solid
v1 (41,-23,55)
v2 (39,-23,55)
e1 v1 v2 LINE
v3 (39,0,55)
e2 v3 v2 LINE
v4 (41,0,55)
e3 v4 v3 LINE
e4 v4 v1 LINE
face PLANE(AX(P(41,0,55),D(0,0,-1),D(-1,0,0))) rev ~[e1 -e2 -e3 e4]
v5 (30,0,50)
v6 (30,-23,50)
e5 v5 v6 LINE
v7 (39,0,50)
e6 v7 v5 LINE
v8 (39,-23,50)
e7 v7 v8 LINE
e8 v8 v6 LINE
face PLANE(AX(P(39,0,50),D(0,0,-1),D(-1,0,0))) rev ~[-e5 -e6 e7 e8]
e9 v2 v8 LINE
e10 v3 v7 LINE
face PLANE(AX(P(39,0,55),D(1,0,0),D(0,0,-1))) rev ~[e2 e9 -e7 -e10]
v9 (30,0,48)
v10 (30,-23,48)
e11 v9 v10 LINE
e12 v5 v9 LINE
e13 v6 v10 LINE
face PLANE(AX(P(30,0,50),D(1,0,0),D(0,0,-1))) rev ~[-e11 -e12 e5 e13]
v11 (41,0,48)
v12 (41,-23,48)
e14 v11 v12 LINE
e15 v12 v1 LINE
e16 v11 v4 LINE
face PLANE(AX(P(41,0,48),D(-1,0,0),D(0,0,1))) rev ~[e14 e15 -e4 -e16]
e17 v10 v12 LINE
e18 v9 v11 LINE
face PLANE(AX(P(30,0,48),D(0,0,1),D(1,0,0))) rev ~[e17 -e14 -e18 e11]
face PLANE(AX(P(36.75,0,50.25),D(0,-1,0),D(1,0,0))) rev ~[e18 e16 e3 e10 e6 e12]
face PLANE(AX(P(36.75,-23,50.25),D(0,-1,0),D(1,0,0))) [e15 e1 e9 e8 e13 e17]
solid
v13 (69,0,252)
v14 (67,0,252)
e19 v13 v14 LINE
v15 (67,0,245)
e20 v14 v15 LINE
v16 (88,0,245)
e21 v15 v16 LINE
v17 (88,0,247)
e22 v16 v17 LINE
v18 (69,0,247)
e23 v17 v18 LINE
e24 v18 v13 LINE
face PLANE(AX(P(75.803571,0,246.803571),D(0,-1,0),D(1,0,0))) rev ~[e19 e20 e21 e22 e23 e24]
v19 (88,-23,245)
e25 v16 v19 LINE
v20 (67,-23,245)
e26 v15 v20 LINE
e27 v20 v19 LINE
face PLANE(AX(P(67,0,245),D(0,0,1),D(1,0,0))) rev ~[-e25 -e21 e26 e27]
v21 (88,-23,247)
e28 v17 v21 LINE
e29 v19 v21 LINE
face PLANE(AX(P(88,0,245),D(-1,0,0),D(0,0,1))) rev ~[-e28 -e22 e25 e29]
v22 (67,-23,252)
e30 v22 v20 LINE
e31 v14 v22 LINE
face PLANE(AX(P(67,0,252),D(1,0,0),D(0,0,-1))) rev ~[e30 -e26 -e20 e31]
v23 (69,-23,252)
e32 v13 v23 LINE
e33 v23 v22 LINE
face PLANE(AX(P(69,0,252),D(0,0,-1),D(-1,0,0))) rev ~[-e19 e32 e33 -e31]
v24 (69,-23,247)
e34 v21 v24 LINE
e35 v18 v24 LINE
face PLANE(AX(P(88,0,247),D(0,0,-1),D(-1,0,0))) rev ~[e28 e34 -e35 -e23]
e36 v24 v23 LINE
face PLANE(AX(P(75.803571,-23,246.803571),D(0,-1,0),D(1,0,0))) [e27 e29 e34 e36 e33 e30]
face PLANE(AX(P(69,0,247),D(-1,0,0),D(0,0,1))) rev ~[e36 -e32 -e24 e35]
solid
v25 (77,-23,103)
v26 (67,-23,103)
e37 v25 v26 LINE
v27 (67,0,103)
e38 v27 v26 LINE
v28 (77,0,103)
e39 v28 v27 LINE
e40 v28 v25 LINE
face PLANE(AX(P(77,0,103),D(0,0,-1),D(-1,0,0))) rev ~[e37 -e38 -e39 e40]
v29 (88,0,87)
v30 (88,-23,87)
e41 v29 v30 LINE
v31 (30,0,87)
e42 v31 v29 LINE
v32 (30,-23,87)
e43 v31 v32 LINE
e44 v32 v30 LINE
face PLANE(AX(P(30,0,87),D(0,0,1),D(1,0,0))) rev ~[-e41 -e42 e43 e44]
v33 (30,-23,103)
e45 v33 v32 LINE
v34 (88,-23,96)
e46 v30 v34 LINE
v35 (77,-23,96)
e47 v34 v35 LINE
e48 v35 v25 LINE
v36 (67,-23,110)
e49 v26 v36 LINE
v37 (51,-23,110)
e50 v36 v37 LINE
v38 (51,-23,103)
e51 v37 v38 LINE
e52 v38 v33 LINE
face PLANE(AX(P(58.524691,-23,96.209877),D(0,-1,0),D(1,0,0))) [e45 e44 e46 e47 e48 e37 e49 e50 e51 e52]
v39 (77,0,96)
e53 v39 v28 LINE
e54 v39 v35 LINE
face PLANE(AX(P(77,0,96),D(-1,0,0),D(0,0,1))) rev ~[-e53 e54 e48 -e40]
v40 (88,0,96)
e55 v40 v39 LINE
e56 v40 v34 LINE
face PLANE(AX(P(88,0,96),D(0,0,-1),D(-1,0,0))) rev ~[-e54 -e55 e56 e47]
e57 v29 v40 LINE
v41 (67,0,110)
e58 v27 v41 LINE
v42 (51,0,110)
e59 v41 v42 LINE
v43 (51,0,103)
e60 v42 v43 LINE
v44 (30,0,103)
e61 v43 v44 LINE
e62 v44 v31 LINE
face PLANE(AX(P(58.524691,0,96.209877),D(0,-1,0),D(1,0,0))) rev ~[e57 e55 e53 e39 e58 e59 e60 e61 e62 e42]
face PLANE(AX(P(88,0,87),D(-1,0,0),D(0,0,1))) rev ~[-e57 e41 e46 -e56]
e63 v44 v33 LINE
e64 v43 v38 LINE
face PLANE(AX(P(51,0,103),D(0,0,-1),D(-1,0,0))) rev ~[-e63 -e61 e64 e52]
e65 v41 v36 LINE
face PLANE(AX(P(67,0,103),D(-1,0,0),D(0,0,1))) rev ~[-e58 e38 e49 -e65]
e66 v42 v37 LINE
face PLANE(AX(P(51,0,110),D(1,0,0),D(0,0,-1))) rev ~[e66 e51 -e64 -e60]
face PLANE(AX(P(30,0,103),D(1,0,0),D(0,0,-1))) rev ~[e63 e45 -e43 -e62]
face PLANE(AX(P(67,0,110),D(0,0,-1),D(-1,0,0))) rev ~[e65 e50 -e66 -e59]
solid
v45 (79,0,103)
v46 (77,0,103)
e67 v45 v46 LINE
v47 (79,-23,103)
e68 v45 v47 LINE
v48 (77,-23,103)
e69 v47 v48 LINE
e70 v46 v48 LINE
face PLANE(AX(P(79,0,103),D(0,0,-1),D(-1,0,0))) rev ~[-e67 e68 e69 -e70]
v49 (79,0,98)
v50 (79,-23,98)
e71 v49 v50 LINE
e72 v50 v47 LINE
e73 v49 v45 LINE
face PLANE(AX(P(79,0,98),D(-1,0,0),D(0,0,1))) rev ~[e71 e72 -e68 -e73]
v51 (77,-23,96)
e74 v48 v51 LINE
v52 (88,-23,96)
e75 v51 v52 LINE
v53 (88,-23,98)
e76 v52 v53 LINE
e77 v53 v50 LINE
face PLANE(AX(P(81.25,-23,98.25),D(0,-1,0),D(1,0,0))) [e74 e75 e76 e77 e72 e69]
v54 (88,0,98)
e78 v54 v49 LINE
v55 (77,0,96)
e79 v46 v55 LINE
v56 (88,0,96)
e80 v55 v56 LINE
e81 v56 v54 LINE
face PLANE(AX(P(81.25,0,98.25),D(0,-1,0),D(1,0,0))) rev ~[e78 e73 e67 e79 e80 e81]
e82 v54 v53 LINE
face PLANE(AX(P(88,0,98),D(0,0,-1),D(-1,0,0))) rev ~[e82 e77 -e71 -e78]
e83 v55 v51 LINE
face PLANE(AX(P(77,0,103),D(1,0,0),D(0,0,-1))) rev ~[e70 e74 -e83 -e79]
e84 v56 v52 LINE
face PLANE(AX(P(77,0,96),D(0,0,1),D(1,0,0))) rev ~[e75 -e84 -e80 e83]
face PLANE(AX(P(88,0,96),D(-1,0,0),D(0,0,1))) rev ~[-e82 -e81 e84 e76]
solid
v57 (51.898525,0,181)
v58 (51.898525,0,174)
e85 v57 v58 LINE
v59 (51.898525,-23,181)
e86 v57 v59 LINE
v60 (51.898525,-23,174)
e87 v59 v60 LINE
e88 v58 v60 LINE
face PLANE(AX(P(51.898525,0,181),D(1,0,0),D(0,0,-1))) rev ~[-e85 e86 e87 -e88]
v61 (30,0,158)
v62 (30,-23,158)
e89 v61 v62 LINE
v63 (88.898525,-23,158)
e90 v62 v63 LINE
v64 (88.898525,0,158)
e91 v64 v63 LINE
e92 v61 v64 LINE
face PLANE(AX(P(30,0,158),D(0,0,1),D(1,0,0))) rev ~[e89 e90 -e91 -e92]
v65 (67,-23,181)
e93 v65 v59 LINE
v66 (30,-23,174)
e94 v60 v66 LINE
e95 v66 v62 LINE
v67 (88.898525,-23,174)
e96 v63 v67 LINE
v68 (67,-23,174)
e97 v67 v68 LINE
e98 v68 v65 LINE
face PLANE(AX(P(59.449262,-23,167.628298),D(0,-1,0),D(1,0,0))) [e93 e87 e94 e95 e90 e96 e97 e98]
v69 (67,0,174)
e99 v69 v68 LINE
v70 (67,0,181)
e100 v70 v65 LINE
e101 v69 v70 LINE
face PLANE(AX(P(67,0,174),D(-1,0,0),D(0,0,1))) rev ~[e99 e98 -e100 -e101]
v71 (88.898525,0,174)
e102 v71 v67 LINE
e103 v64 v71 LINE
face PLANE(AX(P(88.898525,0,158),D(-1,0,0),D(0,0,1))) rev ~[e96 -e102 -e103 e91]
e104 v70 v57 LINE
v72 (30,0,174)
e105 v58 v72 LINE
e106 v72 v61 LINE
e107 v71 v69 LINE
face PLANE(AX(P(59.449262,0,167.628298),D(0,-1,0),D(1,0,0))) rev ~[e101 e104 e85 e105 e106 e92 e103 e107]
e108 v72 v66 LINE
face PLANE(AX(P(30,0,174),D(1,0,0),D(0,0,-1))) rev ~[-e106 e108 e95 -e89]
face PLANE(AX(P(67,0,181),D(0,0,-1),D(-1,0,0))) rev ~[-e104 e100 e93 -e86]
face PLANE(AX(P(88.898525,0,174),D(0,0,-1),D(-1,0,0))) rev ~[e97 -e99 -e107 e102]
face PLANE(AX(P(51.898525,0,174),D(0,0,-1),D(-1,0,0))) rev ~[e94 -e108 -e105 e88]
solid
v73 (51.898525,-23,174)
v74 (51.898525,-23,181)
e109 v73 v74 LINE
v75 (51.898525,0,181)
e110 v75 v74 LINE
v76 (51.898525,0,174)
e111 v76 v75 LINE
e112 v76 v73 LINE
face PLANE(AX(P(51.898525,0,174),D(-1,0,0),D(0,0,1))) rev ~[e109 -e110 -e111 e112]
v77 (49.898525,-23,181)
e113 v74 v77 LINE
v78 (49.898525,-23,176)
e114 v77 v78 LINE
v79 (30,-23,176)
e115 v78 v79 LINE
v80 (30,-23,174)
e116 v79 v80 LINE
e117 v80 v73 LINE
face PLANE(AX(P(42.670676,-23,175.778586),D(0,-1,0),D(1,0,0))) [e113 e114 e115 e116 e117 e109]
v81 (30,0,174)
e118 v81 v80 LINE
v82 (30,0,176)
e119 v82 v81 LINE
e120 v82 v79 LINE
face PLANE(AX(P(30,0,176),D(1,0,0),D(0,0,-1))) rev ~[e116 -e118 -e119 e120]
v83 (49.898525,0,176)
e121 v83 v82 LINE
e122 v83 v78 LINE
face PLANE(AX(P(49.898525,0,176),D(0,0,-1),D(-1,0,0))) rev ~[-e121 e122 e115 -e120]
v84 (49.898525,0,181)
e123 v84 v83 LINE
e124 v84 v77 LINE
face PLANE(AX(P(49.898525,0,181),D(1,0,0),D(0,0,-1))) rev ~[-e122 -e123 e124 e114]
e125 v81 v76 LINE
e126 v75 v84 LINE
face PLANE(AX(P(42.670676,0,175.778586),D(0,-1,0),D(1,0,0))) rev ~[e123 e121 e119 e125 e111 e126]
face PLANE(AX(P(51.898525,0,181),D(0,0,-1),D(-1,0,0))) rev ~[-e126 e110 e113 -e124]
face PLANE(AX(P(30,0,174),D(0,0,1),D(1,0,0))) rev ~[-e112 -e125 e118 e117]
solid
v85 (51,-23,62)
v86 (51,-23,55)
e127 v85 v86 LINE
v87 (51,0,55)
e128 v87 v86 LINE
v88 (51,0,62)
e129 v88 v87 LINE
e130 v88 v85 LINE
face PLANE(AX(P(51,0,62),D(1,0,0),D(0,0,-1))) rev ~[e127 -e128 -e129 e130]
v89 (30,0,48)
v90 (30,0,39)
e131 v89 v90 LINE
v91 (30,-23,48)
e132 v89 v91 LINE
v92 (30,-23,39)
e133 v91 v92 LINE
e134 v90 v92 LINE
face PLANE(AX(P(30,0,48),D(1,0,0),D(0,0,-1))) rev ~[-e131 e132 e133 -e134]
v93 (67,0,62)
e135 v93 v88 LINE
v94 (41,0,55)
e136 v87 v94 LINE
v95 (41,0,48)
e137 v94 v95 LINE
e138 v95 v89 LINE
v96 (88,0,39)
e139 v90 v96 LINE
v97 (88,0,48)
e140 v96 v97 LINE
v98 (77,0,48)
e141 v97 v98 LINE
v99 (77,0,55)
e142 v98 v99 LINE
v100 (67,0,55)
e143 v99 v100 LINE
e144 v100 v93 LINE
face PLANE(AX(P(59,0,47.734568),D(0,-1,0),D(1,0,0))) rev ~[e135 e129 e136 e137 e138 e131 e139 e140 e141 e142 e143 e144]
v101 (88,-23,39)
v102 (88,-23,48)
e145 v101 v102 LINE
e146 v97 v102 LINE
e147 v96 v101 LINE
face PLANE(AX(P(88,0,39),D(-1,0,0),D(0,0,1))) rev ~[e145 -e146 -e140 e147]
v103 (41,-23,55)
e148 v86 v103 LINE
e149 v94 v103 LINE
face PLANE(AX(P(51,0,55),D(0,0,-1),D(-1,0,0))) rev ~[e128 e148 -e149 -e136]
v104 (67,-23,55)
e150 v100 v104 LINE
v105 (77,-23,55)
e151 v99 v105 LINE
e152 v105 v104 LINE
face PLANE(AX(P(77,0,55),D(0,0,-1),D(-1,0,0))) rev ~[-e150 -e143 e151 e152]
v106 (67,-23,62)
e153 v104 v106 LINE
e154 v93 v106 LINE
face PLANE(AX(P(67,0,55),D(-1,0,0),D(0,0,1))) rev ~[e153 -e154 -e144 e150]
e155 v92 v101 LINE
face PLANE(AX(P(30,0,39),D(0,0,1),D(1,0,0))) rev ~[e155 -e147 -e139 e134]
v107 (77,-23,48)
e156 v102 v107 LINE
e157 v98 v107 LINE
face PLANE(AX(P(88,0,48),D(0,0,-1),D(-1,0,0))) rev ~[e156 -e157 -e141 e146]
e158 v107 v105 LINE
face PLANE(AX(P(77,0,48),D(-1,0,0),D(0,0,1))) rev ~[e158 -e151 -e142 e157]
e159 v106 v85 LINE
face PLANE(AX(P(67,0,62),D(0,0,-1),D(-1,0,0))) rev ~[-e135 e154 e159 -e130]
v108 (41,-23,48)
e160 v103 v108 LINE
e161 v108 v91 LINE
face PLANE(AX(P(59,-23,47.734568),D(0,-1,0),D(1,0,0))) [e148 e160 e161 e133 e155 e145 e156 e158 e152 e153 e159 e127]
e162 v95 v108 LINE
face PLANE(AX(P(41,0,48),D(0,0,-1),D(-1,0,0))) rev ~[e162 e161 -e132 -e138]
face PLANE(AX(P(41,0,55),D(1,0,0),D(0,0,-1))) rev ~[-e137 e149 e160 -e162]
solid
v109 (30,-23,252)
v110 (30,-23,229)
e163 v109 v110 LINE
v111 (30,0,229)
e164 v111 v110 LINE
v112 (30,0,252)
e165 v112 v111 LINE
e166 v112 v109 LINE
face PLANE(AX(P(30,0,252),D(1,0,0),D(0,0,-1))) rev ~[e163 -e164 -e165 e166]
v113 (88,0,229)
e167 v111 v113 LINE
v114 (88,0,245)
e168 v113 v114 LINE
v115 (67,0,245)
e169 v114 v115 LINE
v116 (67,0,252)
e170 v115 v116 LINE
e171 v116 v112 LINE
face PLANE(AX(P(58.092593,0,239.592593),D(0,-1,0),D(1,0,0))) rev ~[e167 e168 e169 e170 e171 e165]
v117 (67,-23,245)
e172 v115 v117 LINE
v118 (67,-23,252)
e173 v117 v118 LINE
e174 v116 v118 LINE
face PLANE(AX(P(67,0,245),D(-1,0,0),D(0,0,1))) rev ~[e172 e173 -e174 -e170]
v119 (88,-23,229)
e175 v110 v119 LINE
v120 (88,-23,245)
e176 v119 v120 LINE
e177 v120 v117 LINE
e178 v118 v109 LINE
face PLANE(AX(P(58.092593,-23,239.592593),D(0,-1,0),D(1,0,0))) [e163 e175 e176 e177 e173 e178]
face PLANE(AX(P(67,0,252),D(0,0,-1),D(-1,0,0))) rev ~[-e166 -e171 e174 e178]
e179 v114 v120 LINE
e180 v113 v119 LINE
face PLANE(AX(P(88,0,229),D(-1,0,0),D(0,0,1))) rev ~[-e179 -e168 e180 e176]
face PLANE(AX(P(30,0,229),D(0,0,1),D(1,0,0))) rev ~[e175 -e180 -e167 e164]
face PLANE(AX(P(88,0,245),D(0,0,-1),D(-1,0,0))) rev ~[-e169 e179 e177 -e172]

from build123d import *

# Parameters (mm, degrees)
F4_DEPTH = 23
F5_DEPTH = 23


# Not quite as in the source:
# - a feature names something its author has since deleted; it is built from what else it names


with BuildPart() as f4:
    # F2 (on Front) → F4 (new body)
    with BuildSketch(Plane.XZ):
        Polygon((67, 181), (51.8985245079, 181), (51.8985245079, 174), (30, 174), (30, 158), (88.8985245079, 158), (88.8985245079, 174), (67, 174), align=None)
    extrude(amount=F4_DEPTH)


with BuildPart() as f4b:
    # F1 (on Front) → F4, piece 2 (new body)
    with BuildSketch(Plane.XZ):
        Polygon((67, 252), (30, 252), (30, 229), (88, 229), (88, 245), (67, 245), align=None)
    extrude(amount=F4_DEPTH)


with BuildPart() as f4c:
    # F3 (on Front) → F4, piece 3 (new body)
    with BuildSketch(Plane.XZ):
        Polygon((67, 110), (51, 110), (51, 103), (41, 103), (30, 103), (30, 96), (30, 87), (88, 87), (88, 96), (77, 96), (77, 103), (67, 103), align=None)
    extrude(amount=F4_DEPTH)


with BuildPart() as f4d:
    # F3 (on Front) → F4, piece 4 (new body)
    with BuildSketch(Plane.XZ):
        Polygon((51, 55), (41, 55), (41, 48), (30, 48), (30, 39), (88, 39), (88, 48), (77, 48), (77, 55), (67, 55), (67, 62), (51, 62), align=None)
    extrude(amount=F4_DEPTH)


with BuildPart() as f5:
    # F2 (on Front) → F5 (new body)
    with BuildSketch(Plane.XZ):
        Polygon((51.8985245079, 181), (49.8985245079, 181), (49.8985245079, 176), (30, 176), (30, 174), (51.8985245079, 174), align=None)
    extrude(amount=F5_DEPTH)


with BuildPart() as f5b:
    # F3 (on Front) → F5, piece 2 (new body)
    with BuildSketch(Plane.XZ):
        Polygon((79, 103), (77, 103), (77, 96), (88, 96), (88, 98), (79, 98), align=None)
    extrude(amount=F5_DEPTH)


with BuildPart() as f5c:
    # F3 (on Front) → F5, piece 3 (new body)
    with BuildSketch(Plane.XZ):
        Polygon((41, 48), (41, 55), (39, 55), (39, 50), (30, 50), (30, 48), align=None)
    extrude(amount=F5_DEPTH)


with BuildPart() as f5d:
    # F1 (on Front) → F5, piece 4 (new body)
    with BuildSketch(Plane.XZ):
        Polygon((69, 252), (67, 252), (67, 245), (88, 245), (88, 247), (69, 247), align=None)
    extrude(amount=F5_DEPTH)


solid = Compound([f4.part, f4b.part, f4c.part, f4d.part, f5.part, f5b.part, f5c.part, f5d.part])
